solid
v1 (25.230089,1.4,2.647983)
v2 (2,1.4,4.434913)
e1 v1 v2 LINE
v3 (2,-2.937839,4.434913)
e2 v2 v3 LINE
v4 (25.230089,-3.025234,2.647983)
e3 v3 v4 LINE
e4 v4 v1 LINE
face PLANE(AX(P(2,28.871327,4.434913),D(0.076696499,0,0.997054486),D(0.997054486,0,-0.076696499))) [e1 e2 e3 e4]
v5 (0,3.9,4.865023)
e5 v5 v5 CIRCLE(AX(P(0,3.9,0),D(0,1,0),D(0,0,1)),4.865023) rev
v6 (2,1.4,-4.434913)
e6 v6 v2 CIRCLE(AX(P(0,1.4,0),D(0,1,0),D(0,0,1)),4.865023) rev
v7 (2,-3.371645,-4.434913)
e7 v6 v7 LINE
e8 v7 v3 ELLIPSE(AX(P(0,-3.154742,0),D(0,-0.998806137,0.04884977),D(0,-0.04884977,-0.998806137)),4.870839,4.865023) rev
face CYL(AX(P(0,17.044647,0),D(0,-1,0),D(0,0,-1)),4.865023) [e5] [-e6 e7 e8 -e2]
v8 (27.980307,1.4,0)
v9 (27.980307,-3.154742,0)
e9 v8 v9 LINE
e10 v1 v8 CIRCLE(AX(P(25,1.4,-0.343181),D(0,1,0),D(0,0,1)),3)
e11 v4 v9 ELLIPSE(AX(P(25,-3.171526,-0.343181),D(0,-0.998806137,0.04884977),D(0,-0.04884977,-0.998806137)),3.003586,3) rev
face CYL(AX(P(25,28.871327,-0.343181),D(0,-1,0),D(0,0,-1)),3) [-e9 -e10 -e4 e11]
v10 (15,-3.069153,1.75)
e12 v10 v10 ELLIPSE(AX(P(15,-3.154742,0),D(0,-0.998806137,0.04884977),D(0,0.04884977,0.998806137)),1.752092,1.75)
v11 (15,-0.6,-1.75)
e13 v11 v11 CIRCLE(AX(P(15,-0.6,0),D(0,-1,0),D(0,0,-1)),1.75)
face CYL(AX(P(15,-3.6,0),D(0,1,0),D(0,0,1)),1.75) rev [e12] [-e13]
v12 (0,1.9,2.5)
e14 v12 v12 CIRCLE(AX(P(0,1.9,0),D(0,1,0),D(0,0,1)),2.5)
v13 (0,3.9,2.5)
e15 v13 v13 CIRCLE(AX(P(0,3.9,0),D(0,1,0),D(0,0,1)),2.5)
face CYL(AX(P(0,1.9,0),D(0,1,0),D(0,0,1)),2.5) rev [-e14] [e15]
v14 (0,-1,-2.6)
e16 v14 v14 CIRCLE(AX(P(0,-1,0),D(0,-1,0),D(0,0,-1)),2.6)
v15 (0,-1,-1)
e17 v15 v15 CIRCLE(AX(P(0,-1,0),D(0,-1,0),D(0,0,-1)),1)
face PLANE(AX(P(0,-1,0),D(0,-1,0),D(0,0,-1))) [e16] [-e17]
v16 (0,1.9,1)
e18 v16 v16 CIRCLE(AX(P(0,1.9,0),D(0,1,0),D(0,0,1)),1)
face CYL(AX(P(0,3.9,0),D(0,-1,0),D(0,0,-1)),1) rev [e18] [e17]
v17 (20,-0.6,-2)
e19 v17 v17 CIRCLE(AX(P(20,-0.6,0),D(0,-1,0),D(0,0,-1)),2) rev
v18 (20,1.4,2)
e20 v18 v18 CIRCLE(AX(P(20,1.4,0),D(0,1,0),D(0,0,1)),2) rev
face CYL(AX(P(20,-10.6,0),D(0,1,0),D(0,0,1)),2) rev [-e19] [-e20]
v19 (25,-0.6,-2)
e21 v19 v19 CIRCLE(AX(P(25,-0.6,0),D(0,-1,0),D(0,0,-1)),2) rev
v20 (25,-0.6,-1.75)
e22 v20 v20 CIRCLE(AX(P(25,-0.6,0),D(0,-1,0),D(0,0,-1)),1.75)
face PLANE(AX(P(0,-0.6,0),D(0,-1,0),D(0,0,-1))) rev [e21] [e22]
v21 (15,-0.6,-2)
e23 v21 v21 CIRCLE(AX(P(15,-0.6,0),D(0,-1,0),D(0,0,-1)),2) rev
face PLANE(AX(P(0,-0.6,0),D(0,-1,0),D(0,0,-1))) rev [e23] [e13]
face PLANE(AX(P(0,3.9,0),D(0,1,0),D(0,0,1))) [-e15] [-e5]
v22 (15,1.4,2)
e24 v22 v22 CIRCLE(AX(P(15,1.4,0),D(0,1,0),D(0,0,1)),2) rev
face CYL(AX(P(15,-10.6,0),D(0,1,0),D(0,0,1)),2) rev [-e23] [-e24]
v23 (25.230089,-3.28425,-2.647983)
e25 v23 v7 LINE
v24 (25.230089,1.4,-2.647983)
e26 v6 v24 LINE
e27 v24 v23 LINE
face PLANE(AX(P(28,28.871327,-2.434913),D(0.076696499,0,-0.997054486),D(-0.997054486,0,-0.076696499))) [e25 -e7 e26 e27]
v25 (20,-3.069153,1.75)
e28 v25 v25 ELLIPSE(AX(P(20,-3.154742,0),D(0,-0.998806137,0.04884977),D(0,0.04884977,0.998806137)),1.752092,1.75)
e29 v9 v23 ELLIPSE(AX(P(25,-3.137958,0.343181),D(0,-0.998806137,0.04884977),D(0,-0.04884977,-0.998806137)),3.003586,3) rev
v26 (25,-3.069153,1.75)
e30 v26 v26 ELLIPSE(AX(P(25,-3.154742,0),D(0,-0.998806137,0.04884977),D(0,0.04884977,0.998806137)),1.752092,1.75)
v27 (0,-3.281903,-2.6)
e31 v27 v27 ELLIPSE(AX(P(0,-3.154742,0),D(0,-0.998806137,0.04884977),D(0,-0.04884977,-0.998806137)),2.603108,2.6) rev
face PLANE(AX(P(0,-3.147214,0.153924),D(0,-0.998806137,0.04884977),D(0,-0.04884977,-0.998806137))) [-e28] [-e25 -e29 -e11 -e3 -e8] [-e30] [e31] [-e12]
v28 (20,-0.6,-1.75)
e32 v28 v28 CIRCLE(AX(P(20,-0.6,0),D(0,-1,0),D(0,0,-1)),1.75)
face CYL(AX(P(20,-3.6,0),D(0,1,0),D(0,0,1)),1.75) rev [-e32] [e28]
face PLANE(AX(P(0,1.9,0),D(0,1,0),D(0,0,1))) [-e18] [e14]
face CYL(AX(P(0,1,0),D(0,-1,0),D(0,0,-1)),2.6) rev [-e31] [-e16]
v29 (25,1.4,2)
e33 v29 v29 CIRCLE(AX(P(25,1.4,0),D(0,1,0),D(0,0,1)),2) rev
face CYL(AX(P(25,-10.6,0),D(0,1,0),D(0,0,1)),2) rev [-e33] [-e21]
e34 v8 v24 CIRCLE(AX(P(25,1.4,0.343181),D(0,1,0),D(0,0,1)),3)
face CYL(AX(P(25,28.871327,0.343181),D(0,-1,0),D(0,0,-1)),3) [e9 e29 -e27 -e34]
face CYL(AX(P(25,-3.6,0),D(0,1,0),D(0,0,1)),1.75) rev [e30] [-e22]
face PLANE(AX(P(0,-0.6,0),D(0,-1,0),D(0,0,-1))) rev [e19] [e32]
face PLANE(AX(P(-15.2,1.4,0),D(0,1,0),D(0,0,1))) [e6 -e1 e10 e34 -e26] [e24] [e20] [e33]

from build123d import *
from build123d.topology import SkipClean

# Parameters (mm, degrees)
SKETCH1_R                = 0.6
BOSS_EXTRUDE1_DEPTH      = 1.4
SKETCH2_R                = 2.6
CUT_EXTRUDE1_DEPTH       = 1
SKETCH3_R                = 3.5
SKETCH3_R_2              = 1
BOSS_EXTRUDE2_DEPTH      = 2.5
SKETCH4_R                = 1.2
CUT_EXTRUDE2_DEPTH       = 20.282440198
SKETCH6_W                = 35.735260114
SKETCH6_H                = 17.672039004
CUT_EXTRUDE4_DEPTH       = 20.513392837
CUT_EXTRUDE5_DEPTH       = 18.980545042
SKETCH_1_R               = 0.75
EXTRUDE_1_DEPTH          = 2
EXTRUDE_START            = 0.6
SKETCH_2_R               = 0.6
SKETCH_2_R_2             = 2.6
EXTRUDE_2_DEPTH          = 0.6
CUT_EXTRUDE_1_DEPTH      = 26.836795467
CUT_EXTRUDE_1_DEPTH_BACK = 26.836795467
SKETCH_3_R               = 0.75
SKETCH_3_R_2             = 0.6
EXTRUDE_3_REACH          = 27.837
EXTRUDE_4_DEPTH          = 2
CUT_EXTRUDE_2_DEPTH      = 10
CUT_EXTRUDE_2_DEPTH_BACK = 2
SKETCH_7_R               = 2
FILLET_1_R               = 3
EXTRUDE_START_2          = 3
SKETCH_9_R               = 1.75
SKETCH_9_R_2             = 2.6
EXTRUDE_5_DEPTH          = 3
EXTRUDE_START_3          = -5
SKETCH_10_R              = 4.86502339
SKETCH_10_R_2            = 3.625748898
EXTRUDE_6_DEPTH          = 5
CUT_EXTRUDE_5_DEPTH      = 0.6
CUT_EXTRUDE_5_DEPTH_BACK = 30.442340009
SKETCH_13_W              = 39.79025269
SKETCH_13_H              = 26.985080274
EXTRUDE_START_4          = -2.9
SKETCH_14_R              = 4.86502339
SKETCH_14_R_2            = 1
EXTRUDE_7_DEPTH          = 2.9
SKETCH_15_R              = 2.5
CUT_EXTRUDE_6_DEPTH      = 2
EXTRUDE_START_5          = 2
SKETCH_16_R              = 2.6
SKETCH_16_R_2            = 1
EXTRUDE_8_DEPTH          = 2


with BuildPart() as part:
    # Sketch1 → Boss-Extrude1 (new body)
    with BuildSketch(Plane(origin=(0, 0, 0), x_dir=(1, 0, 0), z_dir=(0, 1, 0))):
        with BuildLine():
            Line((-15.2, 2), (-2, 2.95))
            Line((-2, 2.95), (-2, 6.35))
            ThreePointArc((-2, 6.35), (0, 8.35), (2, 6.35))
            Line((2, 6.35), (2, 3.5))
            Line((2, 3.5), (15.2, 2))
            ThreePointArc((15.2, 2), (17.2, 0), (15.2, -2))
            Line((15.2, -2), (2, -3.5))
            Line((2, -3.5), (2, -6.35))
            ThreePointArc((2, -6.35), (0, -8.35), (-2, -6.35))
            Line((-2, -6.35), (-2, -2.95))
            Line((-2, -2.95), (-15.2, -2))
            ThreePointArc((-15.2, -2), (-17.2, 0), (-15.2, 2))
        make_face()
        with Locations(Location((0, 6.35, 0), (0, 0, 270))):
            Circle(SKETCH1_R, mode=Mode.SUBTRACT)
        with Locations(Location((0, 4.75, 0), (0, 0, 270))):
            Circle(SKETCH1_R, mode=Mode.SUBTRACT)
        with Locations(Location((0, -4.75, 0), (0, 0, 90))):
            Circle(SKETCH1_R, mode=Mode.SUBTRACT)
        with Locations(Location((0, -6.35, 0), (0, 0, 90))):
            Circle(SKETCH1_R, mode=Mode.SUBTRACT)
        with Locations(Location((-15.2, 0, 0), (0, 0, 270))):
            Circle(SKETCH1_R, mode=Mode.SUBTRACT)
        with Locations(Location((15.2, 0, 0), (0, 0, 270))):
            Circle(SKETCH1_R, mode=Mode.SUBTRACT)
        with Locations(Location((-13.4, 0, 0), (0, 0, 270))):
            Circle(SKETCH1_R, mode=Mode.SUBTRACT)
        with Locations(Location((-11.6, 0, 0), (0, 0, 270))):
            Circle(SKETCH1_R, mode=Mode.SUBTRACT)
        with Locations(Location((-9.8, 0, 0), (0, 0, 270))):
            Circle(SKETCH1_R, mode=Mode.SUBTRACT)
        with Locations(Location((-8, 0, 0), (0, 0, 270))):
            Circle(SKETCH1_R, mode=Mode.SUBTRACT)
        with Locations(Location((-6.2, 0, 0), (0, 0, 270))):
            Circle(SKETCH1_R, mode=Mode.SUBTRACT)
        with Locations(Location((-4.4, 0, 0), (0, 0, 270))):
            Circle(SKETCH1_R, mode=Mode.SUBTRACT)
        with Locations(Location((13.4, 0, 0), (0, 0, 270))):
            Circle(SKETCH1_R, mode=Mode.SUBTRACT)
        with Locations(Location((11.6, 0, 0), (0, 0, 270))):
            Circle(SKETCH1_R, mode=Mode.SUBTRACT)
        with Locations(Location((9.8, 0, 0), (0, 0, 270))):
            Circle(SKETCH1_R, mode=Mode.SUBTRACT)
        with Locations(Location((8, 0, 0), (0, 0, 270))):
            Circle(SKETCH1_R, mode=Mode.SUBTRACT)
        with Locations(Location((6.2, 0, 0), (0, 0, 270))):
            Circle(SKETCH1_R, mode=Mode.SUBTRACT)
        with Locations(Location((4.4, 0, 0), (0, 0, 270))):
            Circle(SKETCH1_R, mode=Mode.SUBTRACT)
    extrude(amount=BOSS_EXTRUDE1_DEPTH)

    # Sketch2 → Cut-Extrude1 (cut)
    with BuildSketch(Plane.XZ):
        with Locations(Location((0, 0, 0), (0, 0, 270))):
            Circle(SKETCH2_R)
    extrude(amount=-CUT_EXTRUDE1_DEPTH, mode=Mode.SUBTRACT)

    # Sketch3 → Boss-Extrude2 (add)
    with BuildSketch(Plane(origin=(0, 1.4, 0), x_dir=(1, 0, 0), z_dir=(0, 1, 0))):
        with Locations(Location((0, 0, 0), (0, 0, 270))):
            Circle(SKETCH3_R)
        with Locations(Location((0, 0, 0), (0, 0, 270))):
            Circle(SKETCH3_R_2, mode=Mode.SUBTRACT)
    extrude(amount=BOSS_EXTRUDE2_DEPTH)

    # Sketch4 → Cut-Extrude2 (cut, through all)
    with BuildSketch(Plane(origin=(0, 1.4, 0), x_dir=(1, 0, 0), z_dir=(0, 1, 0))):
        with Locations(Location((0, 0, 0), (0, 0, 270))):
            Circle(SKETCH4_R)
    extrude(amount=-CUT_EXTRUDE2_DEPTH, mode=Mode.SUBTRACT)

    # Sketch6 → Cut-Extrude4 (cut, through all)
    with BuildSketch(Plane.XZ):
        Rectangle(SKETCH6_W, SKETCH6_H)
        with BuildLine():
            Line((-1.868584713, -2.959457918), (-15.2, -2))
            ThreePointArc((-15.2, -2), (-17.2, 0), (-15.2, 2))
            Line((-15.2, 2), (-1.868584713, 2.959457918))
            ThreePointArc((-1.868584713, 2.959457918), (0, 3.5), (1.868584713, 2.959457918))
            Line((1.868584713, 2.959457918), (15.2, 2))
            ThreePointArc((15.2, 2), (17.2, 0), (15.2, -2))
            Line((15.2, -2), (1.868584713, -2.959457918))
            ThreePointArc((1.868584713, -2.959457918), (0, -3.5), (-1.868584713, -2.959457918))
        make_face(mode=Mode.SUBTRACT)
    extrude(amount=-CUT_EXTRUDE4_DEPTH, mode=Mode.SUBTRACT)

    # Sketch7 → Cut-Extrude5 (cut, through all)
    with BuildSketch(Plane.XZ):
        with BuildLine():
            Line((0, 3.5), (-17.731768104, 3.5))
            Line((-17.731768104, 3.5), (-17.731768104, -3.5))
            Line((-17.731768104, -3.5), (0, -3.5))
            ThreePointArc((0, -3.5), (-3.5, 0), (0, 3.5))
        make_face()
    extrude(amount=-CUT_EXTRUDE5_DEPTH, mode=Mode.SUBTRACT)

    # 草圖1 → 填料-伸長1 (add)
    with BuildSketch(Plane(origin=(0, 1.4, 0), x_dir=(1, 0, 0), z_dir=(0, 1, 0))):
        with BuildLine():
            Line((15.2, 2), (23.2, 2))
            ThreePointArc((23.2, 2), (25.2, 0), (23.2, -2))
            Line((23.2, -2), (15.2, -2))
            Line((15.2, -2), (15.2, 2))
        make_face()
        with Locations(Location((17.2, 0, 0), (0, 0, 270))):
            Circle(SKETCH_1_R, mode=Mode.SUBTRACT)
        with Locations(Location((19.2, 0, 0), (0, 0, 270))):
            Circle(SKETCH_1_R, mode=Mode.SUBTRACT)
        with Locations(Location((21.2, 0, 0), (0, 0, 270))):
            Circle(SKETCH_1_R, mode=Mode.SUBTRACT)
        with Locations(Location((23.2, 0, 0), (0, 0, 270))):
            Circle(SKETCH_1_R, mode=Mode.SUBTRACT)
    extrude(amount=-EXTRUDE_1_DEPTH)

    # 草圖2 → 填料-伸長2 (add)
    with SkipClean():  # the faces are left unmerged after this step: merging them gives an invalid solid
        with BuildSketch(Plane.XZ.offset(EXTRUDE_START)):
            with BuildLine():
                ThreePointArc((1.868584713, 2.959457918), (-3.5, 0), (1.868584713, -2.959457918))
                Line((1.868584713, -2.959457918), (15.2, -2))
                Line((15.2, -2), (15.2, -0.6))
                ThreePointArc((15.2, -0.6), (14.6, 0), (15.2, 0.6))
                Line((15.2, 0.6), (15.2, 2))
                Line((15.2, 2), (1.868584713, 2.959457918))
            make_face()
            with Locations(Location((11.6, 0, 0), (0, 0, 270))):
                Circle(SKETCH_2_R, mode=Mode.SUBTRACT)
            with Locations(Location((8, 0, 0), (0, 0, 270))):
                Circle(SKETCH_2_R, mode=Mode.SUBTRACT)
            with Locations(Location((4.4, 0, 0), (0, 0, 270))):
                Circle(SKETCH_2_R, mode=Mode.SUBTRACT)
            with Locations(Location((6.2, 0, 0), (0, 0, 270))):
                Circle(SKETCH_2_R, mode=Mode.SUBTRACT)
            with Locations(Location((9.8, 0, 0), (0, 0, 270))):
                Circle(SKETCH_2_R, mode=Mode.SUBTRACT)
            with Locations(Location((13.4, 0, 0), (0, 0, 270))):
                Circle(SKETCH_2_R, mode=Mode.SUBTRACT)
            with Locations(Location((0, 0, 0), (0, 0, 270))):
                Circle(SKETCH_2_R_2, mode=Mode.SUBTRACT)
        extrude(amount=-EXTRUDE_2_DEPTH)

    # 草圖3 → 除料-伸長1 (cut, two sides: drawn at the far end of the back side and taken through both)
    with SkipClean():  # the faces are left unmerged after this step: merging them gives an invalid solid
        with BuildSketch(Plane.XZ.offset(0.6).offset(-CUT_EXTRUDE_1_DEPTH_BACK)):
            with Locations(Location((17.2, 0, 0), (0, 0, 90))):
                Circle(SKETCH_3_R)
            with Locations(Location((15.2, 0, 0), (0, 0, 270))):
                Circle(SKETCH_3_R_2)
        extrude(amount=CUT_EXTRUDE_1_DEPTH + CUT_EXTRUDE_1_DEPTH_BACK, mode=Mode.SUBTRACT)

    # 填料-伸長3: up to this face of the body (flat: up to its plane)
    extrude_3_end = Plane(part.part.faces().sort_by_distance((0, 3.9, -3.401005051))[0])
    # 草圖4 → 填料-伸長3 (add, up to the picked face)
    with BuildSketch(Plane.XZ.offset(0.6), mode=Mode.PRIVATE) as extrude_3_sk1:
        with BuildLine():
            Line((1.868584713, 2.959457918), (3.972845963, 2.808014874))
            ThreePointArc((3.972845963, 2.808014874), (-4.86502339, 0), (3.972845963, -2.808014874))
            Line((3.972845963, -2.808014874), (1.868584713, -2.959457918))
            ThreePointArc((1.868584713, -2.959457918), (-3.5, 0), (1.868584713, 2.959457918))
        make_face()
    extrude_3_tool1 = split(extrude(extrude_3_sk1.sketch, amount=-EXTRUDE_3_REACH, mode=Mode.PRIVATE), bisect_by=extrude_3_end, keep=Keep.BOTH, mode=Mode.PRIVATE)
    add(extrude_3_tool1.solids().sort_by(Axis((2.930151, -0.6, -3.014844), (0, 1, 0)))[0])

    # 草圖5 → 填料-伸長4 (add)
    with BuildSketch(Plane.XZ.offset(0.6)):
        Polygon((2, 4.434912917), (28, 2.434912917), (28, -2.434912917), (2, -4.434912917), (3, 0), align=None)
    extrude(amount=-EXTRUDE_4_DEPTH)

    # 草圖7 → 除料-伸長2 (cut, two sides: drawn at the far end of the back side and taken through both)
    with BuildSketch(Plane.XZ.offset(0.6).offset(-CUT_EXTRUDE_2_DEPTH_BACK)):
        with Locations(Location((15, 0, 0), (0, 0, 90))):
            Circle(SKETCH_7_R)
        with Locations(Location((25, 0, 0), (0, 0, 90))):
            Circle(SKETCH_7_R)
        with Locations(Location((20, 0, 0), (0, 0, 90))):
            Circle(SKETCH_7_R)
    extrude(amount=CUT_EXTRUDE_2_DEPTH + CUT_EXTRUDE_2_DEPTH_BACK, mode=Mode.SUBTRACT)

    # 圓角1
    # the kernel refuses this fillet: 3 mm, written as the material it takes off along each edge
    with BuildSketch(Plane(origin=(28, -7.545233544, -2.434912917), x_dir=(-0.9970544855015815, 0, -0.07669649888473681), z_dir=(0, 1, 0)), Plane(origin=(28, -7.545233544, 2.434912917), x_dir=(0, 0, -1), z_dir=(0, 1, 0))) as fillet_1_piece_1:
        with BuildLine():
            CenterArc((FILLET_1_R * 0.926031139262, FILLET_1_R), FILLET_1_R, 184.398705355, 85.601294645)
            Line((-FILLET_1_R * 0.0710233462396, FILLET_1_R * 0.923303501115), (0, 0))
            Line((0, 0), (FILLET_1_R * 0.926031139262, 0))
        make_face()
    extrude(amount=15.890467089, mode=Mode.SUBTRACT)

    # 草圖9 → 填料-伸長5 (add)
    with BuildSketch(Plane.XZ.offset(0.6).offset(EXTRUDE_START_2)):
        with BuildLine():
            Line((2, -4.434912917), (25.230089497, -2.647982956))
            ThreePointArc((25.230089497, -2.647982956), (27.080772484, -1.817927055), (27.980306552, 0))
            ThreePointArc((27.980306552, 0), (27.080772484, 1.817927055), (25.230089497, 2.647982956))
            Line((25.230089497, 2.647982956), (2, 4.434912917))
            ThreePointArc((2, 4.434912917), (-4.86502339, 0), (2, -4.434912917))
        make_face()
        with Locations(Location((20, 0, 0), (0, 0, 270))):
            Circle(SKETCH_9_R, mode=Mode.SUBTRACT)
        with Locations(Location((0, 0, 0), (0, 0, 270))):
            Circle(SKETCH_9_R_2, mode=Mode.SUBTRACT)
        with Locations(Location((15, 0, 0), (0, 0, 270))):
            Circle(SKETCH_9_R, mode=Mode.SUBTRACT)
        with Locations(Location((25, 0, 0), (0, 0, 270))):
            Circle(SKETCH_9_R, mode=Mode.SUBTRACT)
    extrude(amount=-EXTRUDE_5_DEPTH)

    # 草圖10 → 填料-伸長6 (add)
    with SkipClean():  # the faces are left unmerged after this step: merging them gives an invalid solid
        with BuildSketch(Plane(origin=(0, 3.9, 0), x_dir=(1, 0, 0), z_dir=(0, 1, 0)).offset(EXTRUDE_START_3)):
            with Locations(Location((0, 0, 0), (0, 0, 65.726189772))):
                Circle(SKETCH_10_R)
            Circle(SKETCH_10_R_2, mode=Mode.SUBTRACT)
        extrude(amount=EXTRUDE_6_DEPTH)

    # 草圖13 → 除料-伸長5 (cut, two sides: drawn at the far end of the back side and taken through both)
    with SkipClean():  # the faces are left unmerged after this step: merging them gives an invalid solid
        with BuildSketch(Plane(origin=(0, -3.746497551, 0.183234299), x_dir=(-1, 0, 0), z_dir=(0, 0.9988061373414341, -0.04884976979561333)).offset(-CUT_EXTRUDE_5_DEPTH_BACK)):
            with Locations((-13.477412417, -0.191670973)):
                Rectangle(SKETCH_13_W, SKETCH_13_H)
        extrude(amount=CUT_EXTRUDE_5_DEPTH + CUT_EXTRUDE_5_DEPTH_BACK, mode=Mode.SUBTRACT)

    # 草圖14 → 填料-伸長7 (add)
    with SkipClean():  # the faces are left unmerged after this step: merging them gives an invalid solid
        with BuildSketch(Plane(origin=(0, 3.9, 0), x_dir=(1, 0, 0), z_dir=(0, 1, 0)).offset(EXTRUDE_START_4)):
            with Locations(Location((0, 0, 0), (0, 0, 65.726189772))):
                Circle(SKETCH_14_R)
            with Locations(Location((0, 0, 0), (0, 0, 90))):
                Circle(SKETCH_14_R_2, mode=Mode.SUBTRACT)
        extrude(amount=EXTRUDE_7_DEPTH)

    # 草圖15 → 除料-伸長6 (cut)
    with SkipClean():  # the faces are left unmerged after this step: merging them gives an invalid solid
        with BuildSketch(Plane(origin=(0, 3.9, 0), x_dir=(1, 0, 0), z_dir=(0, 1, 0))):
            with Locations(Location((0, 0, 0), (0, 0, 270))):
                Circle(SKETCH_15_R)
        extrude(amount=-CUT_EXTRUDE_6_DEPTH, mode=Mode.SUBTRACT)

    # 草圖16 → 填料-伸長8 (add)
    with SkipClean():  # the faces are left unmerged after this step: merging them gives an invalid solid
        with BuildSketch(Plane.XZ.offset(-1).offset(EXTRUDE_START_5)):
            with Locations(Location((0, 0, 0), (0, 0, 270))):
                Circle(SKETCH_16_R)
            with Locations(Location((0, 0, 0), (0, 0, 270))):
                Circle(SKETCH_16_R_2, mode=Mode.SUBTRACT)
        extrude(amount=-EXTRUDE_8_DEPTH)


solid = part.part
